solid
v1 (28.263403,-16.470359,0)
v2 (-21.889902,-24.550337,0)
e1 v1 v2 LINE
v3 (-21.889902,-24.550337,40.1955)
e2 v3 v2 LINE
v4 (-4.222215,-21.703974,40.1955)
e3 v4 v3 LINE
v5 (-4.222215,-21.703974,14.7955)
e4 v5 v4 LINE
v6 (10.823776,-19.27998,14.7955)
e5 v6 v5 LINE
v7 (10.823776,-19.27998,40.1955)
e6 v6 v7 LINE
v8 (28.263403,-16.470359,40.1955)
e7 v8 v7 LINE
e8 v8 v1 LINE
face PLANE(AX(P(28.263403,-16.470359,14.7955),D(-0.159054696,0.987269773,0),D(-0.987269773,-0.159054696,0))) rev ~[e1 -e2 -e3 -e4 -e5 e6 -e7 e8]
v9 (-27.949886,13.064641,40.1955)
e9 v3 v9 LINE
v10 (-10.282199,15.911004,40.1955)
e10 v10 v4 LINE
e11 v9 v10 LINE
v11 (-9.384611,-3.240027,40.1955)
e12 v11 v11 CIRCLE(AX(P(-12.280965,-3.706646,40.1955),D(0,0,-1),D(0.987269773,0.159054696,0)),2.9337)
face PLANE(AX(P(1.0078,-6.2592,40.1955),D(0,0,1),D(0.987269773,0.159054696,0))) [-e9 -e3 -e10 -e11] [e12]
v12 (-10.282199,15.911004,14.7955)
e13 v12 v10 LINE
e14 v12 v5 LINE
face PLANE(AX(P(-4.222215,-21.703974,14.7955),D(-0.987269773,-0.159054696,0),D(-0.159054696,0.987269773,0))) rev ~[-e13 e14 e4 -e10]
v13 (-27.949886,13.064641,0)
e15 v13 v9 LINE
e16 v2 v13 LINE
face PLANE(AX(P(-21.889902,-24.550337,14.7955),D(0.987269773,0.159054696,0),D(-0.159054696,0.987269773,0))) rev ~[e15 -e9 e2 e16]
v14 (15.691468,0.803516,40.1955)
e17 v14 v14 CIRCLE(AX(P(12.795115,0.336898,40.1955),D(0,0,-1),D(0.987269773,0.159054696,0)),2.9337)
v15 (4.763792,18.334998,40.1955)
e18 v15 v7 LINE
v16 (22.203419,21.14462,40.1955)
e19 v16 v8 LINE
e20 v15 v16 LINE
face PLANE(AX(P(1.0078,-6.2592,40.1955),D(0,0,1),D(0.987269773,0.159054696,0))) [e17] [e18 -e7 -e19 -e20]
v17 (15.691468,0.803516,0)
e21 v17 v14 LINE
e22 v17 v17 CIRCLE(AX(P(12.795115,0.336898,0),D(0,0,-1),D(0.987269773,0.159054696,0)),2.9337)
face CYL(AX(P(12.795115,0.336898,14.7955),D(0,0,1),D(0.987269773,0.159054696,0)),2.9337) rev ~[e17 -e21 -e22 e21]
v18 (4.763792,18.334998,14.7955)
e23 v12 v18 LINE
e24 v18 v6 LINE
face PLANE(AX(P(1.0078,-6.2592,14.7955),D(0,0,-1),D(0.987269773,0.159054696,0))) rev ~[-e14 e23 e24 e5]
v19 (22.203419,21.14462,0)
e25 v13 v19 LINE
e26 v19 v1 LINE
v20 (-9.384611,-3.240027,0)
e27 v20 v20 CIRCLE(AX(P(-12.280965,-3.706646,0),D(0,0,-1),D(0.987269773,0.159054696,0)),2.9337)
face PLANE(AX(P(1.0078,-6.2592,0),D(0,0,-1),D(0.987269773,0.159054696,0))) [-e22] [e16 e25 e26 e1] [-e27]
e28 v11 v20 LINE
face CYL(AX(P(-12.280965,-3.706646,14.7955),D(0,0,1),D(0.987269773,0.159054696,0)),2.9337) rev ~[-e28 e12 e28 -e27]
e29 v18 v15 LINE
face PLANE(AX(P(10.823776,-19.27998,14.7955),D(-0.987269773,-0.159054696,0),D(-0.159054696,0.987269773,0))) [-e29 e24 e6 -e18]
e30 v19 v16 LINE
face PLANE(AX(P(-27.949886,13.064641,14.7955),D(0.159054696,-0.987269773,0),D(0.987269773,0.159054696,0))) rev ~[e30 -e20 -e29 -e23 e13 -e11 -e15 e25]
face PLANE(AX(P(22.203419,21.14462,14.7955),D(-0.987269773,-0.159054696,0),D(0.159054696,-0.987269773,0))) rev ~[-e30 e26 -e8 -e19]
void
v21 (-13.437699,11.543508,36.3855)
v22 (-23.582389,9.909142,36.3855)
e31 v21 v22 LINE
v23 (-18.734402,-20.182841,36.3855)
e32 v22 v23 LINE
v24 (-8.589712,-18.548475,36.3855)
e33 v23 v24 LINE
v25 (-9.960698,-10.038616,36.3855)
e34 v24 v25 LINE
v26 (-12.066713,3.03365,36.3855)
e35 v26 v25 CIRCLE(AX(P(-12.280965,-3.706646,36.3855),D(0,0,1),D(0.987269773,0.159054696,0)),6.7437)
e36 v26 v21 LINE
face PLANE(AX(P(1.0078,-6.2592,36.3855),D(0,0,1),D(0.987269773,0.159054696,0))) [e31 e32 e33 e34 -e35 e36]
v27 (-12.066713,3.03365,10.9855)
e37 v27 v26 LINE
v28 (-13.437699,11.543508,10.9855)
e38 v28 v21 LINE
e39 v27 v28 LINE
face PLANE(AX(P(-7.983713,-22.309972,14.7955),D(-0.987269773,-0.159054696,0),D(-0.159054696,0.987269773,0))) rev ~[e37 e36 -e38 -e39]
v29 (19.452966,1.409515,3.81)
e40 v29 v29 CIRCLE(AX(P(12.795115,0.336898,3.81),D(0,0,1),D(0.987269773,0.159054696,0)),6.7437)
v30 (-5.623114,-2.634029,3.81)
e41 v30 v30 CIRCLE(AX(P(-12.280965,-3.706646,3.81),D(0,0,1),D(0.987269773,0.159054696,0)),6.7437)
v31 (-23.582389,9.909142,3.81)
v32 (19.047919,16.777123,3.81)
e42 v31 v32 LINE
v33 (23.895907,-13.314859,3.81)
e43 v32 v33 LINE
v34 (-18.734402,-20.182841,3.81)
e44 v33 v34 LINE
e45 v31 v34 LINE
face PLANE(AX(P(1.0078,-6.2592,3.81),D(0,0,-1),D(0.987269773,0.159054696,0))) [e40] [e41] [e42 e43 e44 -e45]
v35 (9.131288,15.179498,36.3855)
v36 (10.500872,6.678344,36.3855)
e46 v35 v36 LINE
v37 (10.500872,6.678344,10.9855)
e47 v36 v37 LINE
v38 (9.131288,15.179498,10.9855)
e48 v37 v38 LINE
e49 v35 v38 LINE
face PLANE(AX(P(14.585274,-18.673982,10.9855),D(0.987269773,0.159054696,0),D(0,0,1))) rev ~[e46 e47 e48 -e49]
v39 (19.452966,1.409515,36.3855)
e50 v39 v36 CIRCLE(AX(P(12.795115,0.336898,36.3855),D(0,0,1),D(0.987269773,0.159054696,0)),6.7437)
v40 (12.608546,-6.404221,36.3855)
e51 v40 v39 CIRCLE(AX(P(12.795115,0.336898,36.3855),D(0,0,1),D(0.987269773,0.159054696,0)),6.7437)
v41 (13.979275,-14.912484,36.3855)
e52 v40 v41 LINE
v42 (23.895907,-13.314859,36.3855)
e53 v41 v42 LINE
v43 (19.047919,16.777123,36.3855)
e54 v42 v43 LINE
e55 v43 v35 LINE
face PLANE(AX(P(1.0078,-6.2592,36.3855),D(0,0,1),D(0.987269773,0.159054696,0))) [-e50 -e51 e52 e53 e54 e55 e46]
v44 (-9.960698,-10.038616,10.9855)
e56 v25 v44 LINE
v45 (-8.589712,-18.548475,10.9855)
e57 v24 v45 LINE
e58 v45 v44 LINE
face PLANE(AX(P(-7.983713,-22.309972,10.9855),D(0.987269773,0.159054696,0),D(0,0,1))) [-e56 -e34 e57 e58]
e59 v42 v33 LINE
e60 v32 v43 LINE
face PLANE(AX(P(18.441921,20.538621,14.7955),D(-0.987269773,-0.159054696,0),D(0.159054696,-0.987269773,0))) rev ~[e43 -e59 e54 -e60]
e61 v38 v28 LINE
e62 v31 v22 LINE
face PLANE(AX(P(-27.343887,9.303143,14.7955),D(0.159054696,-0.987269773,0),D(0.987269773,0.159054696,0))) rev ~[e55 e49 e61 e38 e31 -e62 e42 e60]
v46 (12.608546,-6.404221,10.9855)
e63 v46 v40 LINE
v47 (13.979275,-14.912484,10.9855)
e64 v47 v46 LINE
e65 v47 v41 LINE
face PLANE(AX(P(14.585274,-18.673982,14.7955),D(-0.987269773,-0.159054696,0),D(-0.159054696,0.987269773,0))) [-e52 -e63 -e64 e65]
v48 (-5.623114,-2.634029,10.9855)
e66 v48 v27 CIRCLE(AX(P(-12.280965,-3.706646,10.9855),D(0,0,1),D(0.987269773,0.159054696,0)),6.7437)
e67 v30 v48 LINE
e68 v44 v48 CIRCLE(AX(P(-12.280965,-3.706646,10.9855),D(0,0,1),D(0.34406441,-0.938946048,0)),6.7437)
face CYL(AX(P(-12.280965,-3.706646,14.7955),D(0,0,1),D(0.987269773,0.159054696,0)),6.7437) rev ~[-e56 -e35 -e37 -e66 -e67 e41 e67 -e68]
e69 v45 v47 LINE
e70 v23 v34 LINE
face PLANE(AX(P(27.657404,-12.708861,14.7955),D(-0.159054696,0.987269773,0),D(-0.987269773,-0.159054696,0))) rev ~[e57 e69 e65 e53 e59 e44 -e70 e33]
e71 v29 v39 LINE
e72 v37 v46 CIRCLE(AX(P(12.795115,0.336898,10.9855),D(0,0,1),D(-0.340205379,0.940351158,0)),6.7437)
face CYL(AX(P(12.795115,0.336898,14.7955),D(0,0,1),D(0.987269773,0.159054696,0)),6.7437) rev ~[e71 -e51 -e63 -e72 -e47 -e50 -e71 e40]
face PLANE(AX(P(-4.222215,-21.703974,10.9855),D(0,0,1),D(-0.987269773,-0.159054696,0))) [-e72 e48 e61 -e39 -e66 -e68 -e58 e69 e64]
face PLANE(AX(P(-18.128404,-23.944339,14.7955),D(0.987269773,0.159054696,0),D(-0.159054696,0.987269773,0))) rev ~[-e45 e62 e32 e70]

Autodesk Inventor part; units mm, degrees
ref_plane "YZ Plane" through (0, 0, 0) normal (1, 0, 0) x (0, 1, 0)
ref_plane "XZ Plane" through (0, 0, 0) normal (0, 1, 0) x (-1, 0, 0)
ref_plane "Work Plane1" through (1.0078, -6.2592, 14.7955) normal (0, 0, -1) x (0.9872698, 0.1590547, 0)
sketch "Sketch1" plane through (1.0078, -6.2592, 14.7955) normal (0, 0, -1) x (0.9872698, 0.1590547, 0)
  circle A0 centre (12.6864, -4.6373) radius 2.9337 projected
  circle A1 centre (-12.7136, -4.6337) radius 2.9337 projected
  line L0 (25.2845, 14.4163) -> (-25.5155, 14.4163)
  line L1 (-25.5155, 14.4163) -> (-25.5155, -23.6837)
  line L2 (-25.5155, -23.6837) -> (25.2845, -23.6837)
  line L3 (25.2845, -23.6837) -> (25.2845, 14.4163)
  point P0 (0.0006, -6.3398)
  dimension "d0" = 50.8
  dimension "d1" = 38.1
  dimension "d2" = 19.05
  dimension "d3" = 12.8018
ref_plane "Work Plane2" through (-93.6315, -146.1207, 0) normal (0, 0, 1) x (1, 0, 0)
extrude "Extrusion1" add sketch "Sketch1" along normal up to surface (14.7955 mm away)
sketch "Sketch2" plane through (1.0078, -6.2592, 14.7955) normal (0, 0, 1) x (0.9872698, 0.1590547, 0)
  line L0 (6.35, -58.321) -> (6.35, 48.9196) projected
  line L1 (-6.35, 49.2476) -> (-6.35, -58.321) projected
  circle A0 centre (-12.7136, 4.6337) radius 2.9337 projected
  circle A1 centre (12.6864, 4.6373) radius 2.9337 projected
  line L2 (25.2845, -14.4163) -> (-25.5155, -14.4163) projected
  line L3 (25.2845, 23.6837) -> (25.2845, -14.4163) projected
  line L4 (-25.5155, 23.6837) -> (25.2845, 23.6837) projected
  line L5 (-25.5155, -14.4163) -> (-25.5155, 23.6837) projected
  line L6 (25.2845, -14.4163) -> (-25.5155, -14.4163) projected
  line L7 (25.2845, -14.4163) -> (7.62, -14.4163)
  line L8 (7.62, -14.4163) -> (7.62, 23.6837)
  line L9 (7.62, 23.6837) -> (25.2845, 23.6837)
  line L10 (25.2845, 23.6837) -> (25.2845, -14.4163)
  line L11 (-25.5155, -14.4163) -> (-25.5155, 23.6837) projected
  line L12 (-25.5155, -14.4163) -> (-7.62, -14.4163)
  line L13 (-7.62, -14.4163) -> (-7.62, 23.6837)
  line L14 (-7.62, 23.6837) -> (-25.5155, 23.6837)
  line L15 (-25.5155, 23.6837) -> (-25.5155, -14.4163)
  point P0 (0.0006, 6.3398)
  dimension "d6" = 1.27
  dimension "d7" = 1.27
extrude "Extrusion2" add sketch "Sketch2" along normal blind 25.4 contours L8 L4 L3 L2 | L2 L5 L4 L13
shell "Shell1" thickness 3.81 removed faces 0
properties part number "wrench holder"
